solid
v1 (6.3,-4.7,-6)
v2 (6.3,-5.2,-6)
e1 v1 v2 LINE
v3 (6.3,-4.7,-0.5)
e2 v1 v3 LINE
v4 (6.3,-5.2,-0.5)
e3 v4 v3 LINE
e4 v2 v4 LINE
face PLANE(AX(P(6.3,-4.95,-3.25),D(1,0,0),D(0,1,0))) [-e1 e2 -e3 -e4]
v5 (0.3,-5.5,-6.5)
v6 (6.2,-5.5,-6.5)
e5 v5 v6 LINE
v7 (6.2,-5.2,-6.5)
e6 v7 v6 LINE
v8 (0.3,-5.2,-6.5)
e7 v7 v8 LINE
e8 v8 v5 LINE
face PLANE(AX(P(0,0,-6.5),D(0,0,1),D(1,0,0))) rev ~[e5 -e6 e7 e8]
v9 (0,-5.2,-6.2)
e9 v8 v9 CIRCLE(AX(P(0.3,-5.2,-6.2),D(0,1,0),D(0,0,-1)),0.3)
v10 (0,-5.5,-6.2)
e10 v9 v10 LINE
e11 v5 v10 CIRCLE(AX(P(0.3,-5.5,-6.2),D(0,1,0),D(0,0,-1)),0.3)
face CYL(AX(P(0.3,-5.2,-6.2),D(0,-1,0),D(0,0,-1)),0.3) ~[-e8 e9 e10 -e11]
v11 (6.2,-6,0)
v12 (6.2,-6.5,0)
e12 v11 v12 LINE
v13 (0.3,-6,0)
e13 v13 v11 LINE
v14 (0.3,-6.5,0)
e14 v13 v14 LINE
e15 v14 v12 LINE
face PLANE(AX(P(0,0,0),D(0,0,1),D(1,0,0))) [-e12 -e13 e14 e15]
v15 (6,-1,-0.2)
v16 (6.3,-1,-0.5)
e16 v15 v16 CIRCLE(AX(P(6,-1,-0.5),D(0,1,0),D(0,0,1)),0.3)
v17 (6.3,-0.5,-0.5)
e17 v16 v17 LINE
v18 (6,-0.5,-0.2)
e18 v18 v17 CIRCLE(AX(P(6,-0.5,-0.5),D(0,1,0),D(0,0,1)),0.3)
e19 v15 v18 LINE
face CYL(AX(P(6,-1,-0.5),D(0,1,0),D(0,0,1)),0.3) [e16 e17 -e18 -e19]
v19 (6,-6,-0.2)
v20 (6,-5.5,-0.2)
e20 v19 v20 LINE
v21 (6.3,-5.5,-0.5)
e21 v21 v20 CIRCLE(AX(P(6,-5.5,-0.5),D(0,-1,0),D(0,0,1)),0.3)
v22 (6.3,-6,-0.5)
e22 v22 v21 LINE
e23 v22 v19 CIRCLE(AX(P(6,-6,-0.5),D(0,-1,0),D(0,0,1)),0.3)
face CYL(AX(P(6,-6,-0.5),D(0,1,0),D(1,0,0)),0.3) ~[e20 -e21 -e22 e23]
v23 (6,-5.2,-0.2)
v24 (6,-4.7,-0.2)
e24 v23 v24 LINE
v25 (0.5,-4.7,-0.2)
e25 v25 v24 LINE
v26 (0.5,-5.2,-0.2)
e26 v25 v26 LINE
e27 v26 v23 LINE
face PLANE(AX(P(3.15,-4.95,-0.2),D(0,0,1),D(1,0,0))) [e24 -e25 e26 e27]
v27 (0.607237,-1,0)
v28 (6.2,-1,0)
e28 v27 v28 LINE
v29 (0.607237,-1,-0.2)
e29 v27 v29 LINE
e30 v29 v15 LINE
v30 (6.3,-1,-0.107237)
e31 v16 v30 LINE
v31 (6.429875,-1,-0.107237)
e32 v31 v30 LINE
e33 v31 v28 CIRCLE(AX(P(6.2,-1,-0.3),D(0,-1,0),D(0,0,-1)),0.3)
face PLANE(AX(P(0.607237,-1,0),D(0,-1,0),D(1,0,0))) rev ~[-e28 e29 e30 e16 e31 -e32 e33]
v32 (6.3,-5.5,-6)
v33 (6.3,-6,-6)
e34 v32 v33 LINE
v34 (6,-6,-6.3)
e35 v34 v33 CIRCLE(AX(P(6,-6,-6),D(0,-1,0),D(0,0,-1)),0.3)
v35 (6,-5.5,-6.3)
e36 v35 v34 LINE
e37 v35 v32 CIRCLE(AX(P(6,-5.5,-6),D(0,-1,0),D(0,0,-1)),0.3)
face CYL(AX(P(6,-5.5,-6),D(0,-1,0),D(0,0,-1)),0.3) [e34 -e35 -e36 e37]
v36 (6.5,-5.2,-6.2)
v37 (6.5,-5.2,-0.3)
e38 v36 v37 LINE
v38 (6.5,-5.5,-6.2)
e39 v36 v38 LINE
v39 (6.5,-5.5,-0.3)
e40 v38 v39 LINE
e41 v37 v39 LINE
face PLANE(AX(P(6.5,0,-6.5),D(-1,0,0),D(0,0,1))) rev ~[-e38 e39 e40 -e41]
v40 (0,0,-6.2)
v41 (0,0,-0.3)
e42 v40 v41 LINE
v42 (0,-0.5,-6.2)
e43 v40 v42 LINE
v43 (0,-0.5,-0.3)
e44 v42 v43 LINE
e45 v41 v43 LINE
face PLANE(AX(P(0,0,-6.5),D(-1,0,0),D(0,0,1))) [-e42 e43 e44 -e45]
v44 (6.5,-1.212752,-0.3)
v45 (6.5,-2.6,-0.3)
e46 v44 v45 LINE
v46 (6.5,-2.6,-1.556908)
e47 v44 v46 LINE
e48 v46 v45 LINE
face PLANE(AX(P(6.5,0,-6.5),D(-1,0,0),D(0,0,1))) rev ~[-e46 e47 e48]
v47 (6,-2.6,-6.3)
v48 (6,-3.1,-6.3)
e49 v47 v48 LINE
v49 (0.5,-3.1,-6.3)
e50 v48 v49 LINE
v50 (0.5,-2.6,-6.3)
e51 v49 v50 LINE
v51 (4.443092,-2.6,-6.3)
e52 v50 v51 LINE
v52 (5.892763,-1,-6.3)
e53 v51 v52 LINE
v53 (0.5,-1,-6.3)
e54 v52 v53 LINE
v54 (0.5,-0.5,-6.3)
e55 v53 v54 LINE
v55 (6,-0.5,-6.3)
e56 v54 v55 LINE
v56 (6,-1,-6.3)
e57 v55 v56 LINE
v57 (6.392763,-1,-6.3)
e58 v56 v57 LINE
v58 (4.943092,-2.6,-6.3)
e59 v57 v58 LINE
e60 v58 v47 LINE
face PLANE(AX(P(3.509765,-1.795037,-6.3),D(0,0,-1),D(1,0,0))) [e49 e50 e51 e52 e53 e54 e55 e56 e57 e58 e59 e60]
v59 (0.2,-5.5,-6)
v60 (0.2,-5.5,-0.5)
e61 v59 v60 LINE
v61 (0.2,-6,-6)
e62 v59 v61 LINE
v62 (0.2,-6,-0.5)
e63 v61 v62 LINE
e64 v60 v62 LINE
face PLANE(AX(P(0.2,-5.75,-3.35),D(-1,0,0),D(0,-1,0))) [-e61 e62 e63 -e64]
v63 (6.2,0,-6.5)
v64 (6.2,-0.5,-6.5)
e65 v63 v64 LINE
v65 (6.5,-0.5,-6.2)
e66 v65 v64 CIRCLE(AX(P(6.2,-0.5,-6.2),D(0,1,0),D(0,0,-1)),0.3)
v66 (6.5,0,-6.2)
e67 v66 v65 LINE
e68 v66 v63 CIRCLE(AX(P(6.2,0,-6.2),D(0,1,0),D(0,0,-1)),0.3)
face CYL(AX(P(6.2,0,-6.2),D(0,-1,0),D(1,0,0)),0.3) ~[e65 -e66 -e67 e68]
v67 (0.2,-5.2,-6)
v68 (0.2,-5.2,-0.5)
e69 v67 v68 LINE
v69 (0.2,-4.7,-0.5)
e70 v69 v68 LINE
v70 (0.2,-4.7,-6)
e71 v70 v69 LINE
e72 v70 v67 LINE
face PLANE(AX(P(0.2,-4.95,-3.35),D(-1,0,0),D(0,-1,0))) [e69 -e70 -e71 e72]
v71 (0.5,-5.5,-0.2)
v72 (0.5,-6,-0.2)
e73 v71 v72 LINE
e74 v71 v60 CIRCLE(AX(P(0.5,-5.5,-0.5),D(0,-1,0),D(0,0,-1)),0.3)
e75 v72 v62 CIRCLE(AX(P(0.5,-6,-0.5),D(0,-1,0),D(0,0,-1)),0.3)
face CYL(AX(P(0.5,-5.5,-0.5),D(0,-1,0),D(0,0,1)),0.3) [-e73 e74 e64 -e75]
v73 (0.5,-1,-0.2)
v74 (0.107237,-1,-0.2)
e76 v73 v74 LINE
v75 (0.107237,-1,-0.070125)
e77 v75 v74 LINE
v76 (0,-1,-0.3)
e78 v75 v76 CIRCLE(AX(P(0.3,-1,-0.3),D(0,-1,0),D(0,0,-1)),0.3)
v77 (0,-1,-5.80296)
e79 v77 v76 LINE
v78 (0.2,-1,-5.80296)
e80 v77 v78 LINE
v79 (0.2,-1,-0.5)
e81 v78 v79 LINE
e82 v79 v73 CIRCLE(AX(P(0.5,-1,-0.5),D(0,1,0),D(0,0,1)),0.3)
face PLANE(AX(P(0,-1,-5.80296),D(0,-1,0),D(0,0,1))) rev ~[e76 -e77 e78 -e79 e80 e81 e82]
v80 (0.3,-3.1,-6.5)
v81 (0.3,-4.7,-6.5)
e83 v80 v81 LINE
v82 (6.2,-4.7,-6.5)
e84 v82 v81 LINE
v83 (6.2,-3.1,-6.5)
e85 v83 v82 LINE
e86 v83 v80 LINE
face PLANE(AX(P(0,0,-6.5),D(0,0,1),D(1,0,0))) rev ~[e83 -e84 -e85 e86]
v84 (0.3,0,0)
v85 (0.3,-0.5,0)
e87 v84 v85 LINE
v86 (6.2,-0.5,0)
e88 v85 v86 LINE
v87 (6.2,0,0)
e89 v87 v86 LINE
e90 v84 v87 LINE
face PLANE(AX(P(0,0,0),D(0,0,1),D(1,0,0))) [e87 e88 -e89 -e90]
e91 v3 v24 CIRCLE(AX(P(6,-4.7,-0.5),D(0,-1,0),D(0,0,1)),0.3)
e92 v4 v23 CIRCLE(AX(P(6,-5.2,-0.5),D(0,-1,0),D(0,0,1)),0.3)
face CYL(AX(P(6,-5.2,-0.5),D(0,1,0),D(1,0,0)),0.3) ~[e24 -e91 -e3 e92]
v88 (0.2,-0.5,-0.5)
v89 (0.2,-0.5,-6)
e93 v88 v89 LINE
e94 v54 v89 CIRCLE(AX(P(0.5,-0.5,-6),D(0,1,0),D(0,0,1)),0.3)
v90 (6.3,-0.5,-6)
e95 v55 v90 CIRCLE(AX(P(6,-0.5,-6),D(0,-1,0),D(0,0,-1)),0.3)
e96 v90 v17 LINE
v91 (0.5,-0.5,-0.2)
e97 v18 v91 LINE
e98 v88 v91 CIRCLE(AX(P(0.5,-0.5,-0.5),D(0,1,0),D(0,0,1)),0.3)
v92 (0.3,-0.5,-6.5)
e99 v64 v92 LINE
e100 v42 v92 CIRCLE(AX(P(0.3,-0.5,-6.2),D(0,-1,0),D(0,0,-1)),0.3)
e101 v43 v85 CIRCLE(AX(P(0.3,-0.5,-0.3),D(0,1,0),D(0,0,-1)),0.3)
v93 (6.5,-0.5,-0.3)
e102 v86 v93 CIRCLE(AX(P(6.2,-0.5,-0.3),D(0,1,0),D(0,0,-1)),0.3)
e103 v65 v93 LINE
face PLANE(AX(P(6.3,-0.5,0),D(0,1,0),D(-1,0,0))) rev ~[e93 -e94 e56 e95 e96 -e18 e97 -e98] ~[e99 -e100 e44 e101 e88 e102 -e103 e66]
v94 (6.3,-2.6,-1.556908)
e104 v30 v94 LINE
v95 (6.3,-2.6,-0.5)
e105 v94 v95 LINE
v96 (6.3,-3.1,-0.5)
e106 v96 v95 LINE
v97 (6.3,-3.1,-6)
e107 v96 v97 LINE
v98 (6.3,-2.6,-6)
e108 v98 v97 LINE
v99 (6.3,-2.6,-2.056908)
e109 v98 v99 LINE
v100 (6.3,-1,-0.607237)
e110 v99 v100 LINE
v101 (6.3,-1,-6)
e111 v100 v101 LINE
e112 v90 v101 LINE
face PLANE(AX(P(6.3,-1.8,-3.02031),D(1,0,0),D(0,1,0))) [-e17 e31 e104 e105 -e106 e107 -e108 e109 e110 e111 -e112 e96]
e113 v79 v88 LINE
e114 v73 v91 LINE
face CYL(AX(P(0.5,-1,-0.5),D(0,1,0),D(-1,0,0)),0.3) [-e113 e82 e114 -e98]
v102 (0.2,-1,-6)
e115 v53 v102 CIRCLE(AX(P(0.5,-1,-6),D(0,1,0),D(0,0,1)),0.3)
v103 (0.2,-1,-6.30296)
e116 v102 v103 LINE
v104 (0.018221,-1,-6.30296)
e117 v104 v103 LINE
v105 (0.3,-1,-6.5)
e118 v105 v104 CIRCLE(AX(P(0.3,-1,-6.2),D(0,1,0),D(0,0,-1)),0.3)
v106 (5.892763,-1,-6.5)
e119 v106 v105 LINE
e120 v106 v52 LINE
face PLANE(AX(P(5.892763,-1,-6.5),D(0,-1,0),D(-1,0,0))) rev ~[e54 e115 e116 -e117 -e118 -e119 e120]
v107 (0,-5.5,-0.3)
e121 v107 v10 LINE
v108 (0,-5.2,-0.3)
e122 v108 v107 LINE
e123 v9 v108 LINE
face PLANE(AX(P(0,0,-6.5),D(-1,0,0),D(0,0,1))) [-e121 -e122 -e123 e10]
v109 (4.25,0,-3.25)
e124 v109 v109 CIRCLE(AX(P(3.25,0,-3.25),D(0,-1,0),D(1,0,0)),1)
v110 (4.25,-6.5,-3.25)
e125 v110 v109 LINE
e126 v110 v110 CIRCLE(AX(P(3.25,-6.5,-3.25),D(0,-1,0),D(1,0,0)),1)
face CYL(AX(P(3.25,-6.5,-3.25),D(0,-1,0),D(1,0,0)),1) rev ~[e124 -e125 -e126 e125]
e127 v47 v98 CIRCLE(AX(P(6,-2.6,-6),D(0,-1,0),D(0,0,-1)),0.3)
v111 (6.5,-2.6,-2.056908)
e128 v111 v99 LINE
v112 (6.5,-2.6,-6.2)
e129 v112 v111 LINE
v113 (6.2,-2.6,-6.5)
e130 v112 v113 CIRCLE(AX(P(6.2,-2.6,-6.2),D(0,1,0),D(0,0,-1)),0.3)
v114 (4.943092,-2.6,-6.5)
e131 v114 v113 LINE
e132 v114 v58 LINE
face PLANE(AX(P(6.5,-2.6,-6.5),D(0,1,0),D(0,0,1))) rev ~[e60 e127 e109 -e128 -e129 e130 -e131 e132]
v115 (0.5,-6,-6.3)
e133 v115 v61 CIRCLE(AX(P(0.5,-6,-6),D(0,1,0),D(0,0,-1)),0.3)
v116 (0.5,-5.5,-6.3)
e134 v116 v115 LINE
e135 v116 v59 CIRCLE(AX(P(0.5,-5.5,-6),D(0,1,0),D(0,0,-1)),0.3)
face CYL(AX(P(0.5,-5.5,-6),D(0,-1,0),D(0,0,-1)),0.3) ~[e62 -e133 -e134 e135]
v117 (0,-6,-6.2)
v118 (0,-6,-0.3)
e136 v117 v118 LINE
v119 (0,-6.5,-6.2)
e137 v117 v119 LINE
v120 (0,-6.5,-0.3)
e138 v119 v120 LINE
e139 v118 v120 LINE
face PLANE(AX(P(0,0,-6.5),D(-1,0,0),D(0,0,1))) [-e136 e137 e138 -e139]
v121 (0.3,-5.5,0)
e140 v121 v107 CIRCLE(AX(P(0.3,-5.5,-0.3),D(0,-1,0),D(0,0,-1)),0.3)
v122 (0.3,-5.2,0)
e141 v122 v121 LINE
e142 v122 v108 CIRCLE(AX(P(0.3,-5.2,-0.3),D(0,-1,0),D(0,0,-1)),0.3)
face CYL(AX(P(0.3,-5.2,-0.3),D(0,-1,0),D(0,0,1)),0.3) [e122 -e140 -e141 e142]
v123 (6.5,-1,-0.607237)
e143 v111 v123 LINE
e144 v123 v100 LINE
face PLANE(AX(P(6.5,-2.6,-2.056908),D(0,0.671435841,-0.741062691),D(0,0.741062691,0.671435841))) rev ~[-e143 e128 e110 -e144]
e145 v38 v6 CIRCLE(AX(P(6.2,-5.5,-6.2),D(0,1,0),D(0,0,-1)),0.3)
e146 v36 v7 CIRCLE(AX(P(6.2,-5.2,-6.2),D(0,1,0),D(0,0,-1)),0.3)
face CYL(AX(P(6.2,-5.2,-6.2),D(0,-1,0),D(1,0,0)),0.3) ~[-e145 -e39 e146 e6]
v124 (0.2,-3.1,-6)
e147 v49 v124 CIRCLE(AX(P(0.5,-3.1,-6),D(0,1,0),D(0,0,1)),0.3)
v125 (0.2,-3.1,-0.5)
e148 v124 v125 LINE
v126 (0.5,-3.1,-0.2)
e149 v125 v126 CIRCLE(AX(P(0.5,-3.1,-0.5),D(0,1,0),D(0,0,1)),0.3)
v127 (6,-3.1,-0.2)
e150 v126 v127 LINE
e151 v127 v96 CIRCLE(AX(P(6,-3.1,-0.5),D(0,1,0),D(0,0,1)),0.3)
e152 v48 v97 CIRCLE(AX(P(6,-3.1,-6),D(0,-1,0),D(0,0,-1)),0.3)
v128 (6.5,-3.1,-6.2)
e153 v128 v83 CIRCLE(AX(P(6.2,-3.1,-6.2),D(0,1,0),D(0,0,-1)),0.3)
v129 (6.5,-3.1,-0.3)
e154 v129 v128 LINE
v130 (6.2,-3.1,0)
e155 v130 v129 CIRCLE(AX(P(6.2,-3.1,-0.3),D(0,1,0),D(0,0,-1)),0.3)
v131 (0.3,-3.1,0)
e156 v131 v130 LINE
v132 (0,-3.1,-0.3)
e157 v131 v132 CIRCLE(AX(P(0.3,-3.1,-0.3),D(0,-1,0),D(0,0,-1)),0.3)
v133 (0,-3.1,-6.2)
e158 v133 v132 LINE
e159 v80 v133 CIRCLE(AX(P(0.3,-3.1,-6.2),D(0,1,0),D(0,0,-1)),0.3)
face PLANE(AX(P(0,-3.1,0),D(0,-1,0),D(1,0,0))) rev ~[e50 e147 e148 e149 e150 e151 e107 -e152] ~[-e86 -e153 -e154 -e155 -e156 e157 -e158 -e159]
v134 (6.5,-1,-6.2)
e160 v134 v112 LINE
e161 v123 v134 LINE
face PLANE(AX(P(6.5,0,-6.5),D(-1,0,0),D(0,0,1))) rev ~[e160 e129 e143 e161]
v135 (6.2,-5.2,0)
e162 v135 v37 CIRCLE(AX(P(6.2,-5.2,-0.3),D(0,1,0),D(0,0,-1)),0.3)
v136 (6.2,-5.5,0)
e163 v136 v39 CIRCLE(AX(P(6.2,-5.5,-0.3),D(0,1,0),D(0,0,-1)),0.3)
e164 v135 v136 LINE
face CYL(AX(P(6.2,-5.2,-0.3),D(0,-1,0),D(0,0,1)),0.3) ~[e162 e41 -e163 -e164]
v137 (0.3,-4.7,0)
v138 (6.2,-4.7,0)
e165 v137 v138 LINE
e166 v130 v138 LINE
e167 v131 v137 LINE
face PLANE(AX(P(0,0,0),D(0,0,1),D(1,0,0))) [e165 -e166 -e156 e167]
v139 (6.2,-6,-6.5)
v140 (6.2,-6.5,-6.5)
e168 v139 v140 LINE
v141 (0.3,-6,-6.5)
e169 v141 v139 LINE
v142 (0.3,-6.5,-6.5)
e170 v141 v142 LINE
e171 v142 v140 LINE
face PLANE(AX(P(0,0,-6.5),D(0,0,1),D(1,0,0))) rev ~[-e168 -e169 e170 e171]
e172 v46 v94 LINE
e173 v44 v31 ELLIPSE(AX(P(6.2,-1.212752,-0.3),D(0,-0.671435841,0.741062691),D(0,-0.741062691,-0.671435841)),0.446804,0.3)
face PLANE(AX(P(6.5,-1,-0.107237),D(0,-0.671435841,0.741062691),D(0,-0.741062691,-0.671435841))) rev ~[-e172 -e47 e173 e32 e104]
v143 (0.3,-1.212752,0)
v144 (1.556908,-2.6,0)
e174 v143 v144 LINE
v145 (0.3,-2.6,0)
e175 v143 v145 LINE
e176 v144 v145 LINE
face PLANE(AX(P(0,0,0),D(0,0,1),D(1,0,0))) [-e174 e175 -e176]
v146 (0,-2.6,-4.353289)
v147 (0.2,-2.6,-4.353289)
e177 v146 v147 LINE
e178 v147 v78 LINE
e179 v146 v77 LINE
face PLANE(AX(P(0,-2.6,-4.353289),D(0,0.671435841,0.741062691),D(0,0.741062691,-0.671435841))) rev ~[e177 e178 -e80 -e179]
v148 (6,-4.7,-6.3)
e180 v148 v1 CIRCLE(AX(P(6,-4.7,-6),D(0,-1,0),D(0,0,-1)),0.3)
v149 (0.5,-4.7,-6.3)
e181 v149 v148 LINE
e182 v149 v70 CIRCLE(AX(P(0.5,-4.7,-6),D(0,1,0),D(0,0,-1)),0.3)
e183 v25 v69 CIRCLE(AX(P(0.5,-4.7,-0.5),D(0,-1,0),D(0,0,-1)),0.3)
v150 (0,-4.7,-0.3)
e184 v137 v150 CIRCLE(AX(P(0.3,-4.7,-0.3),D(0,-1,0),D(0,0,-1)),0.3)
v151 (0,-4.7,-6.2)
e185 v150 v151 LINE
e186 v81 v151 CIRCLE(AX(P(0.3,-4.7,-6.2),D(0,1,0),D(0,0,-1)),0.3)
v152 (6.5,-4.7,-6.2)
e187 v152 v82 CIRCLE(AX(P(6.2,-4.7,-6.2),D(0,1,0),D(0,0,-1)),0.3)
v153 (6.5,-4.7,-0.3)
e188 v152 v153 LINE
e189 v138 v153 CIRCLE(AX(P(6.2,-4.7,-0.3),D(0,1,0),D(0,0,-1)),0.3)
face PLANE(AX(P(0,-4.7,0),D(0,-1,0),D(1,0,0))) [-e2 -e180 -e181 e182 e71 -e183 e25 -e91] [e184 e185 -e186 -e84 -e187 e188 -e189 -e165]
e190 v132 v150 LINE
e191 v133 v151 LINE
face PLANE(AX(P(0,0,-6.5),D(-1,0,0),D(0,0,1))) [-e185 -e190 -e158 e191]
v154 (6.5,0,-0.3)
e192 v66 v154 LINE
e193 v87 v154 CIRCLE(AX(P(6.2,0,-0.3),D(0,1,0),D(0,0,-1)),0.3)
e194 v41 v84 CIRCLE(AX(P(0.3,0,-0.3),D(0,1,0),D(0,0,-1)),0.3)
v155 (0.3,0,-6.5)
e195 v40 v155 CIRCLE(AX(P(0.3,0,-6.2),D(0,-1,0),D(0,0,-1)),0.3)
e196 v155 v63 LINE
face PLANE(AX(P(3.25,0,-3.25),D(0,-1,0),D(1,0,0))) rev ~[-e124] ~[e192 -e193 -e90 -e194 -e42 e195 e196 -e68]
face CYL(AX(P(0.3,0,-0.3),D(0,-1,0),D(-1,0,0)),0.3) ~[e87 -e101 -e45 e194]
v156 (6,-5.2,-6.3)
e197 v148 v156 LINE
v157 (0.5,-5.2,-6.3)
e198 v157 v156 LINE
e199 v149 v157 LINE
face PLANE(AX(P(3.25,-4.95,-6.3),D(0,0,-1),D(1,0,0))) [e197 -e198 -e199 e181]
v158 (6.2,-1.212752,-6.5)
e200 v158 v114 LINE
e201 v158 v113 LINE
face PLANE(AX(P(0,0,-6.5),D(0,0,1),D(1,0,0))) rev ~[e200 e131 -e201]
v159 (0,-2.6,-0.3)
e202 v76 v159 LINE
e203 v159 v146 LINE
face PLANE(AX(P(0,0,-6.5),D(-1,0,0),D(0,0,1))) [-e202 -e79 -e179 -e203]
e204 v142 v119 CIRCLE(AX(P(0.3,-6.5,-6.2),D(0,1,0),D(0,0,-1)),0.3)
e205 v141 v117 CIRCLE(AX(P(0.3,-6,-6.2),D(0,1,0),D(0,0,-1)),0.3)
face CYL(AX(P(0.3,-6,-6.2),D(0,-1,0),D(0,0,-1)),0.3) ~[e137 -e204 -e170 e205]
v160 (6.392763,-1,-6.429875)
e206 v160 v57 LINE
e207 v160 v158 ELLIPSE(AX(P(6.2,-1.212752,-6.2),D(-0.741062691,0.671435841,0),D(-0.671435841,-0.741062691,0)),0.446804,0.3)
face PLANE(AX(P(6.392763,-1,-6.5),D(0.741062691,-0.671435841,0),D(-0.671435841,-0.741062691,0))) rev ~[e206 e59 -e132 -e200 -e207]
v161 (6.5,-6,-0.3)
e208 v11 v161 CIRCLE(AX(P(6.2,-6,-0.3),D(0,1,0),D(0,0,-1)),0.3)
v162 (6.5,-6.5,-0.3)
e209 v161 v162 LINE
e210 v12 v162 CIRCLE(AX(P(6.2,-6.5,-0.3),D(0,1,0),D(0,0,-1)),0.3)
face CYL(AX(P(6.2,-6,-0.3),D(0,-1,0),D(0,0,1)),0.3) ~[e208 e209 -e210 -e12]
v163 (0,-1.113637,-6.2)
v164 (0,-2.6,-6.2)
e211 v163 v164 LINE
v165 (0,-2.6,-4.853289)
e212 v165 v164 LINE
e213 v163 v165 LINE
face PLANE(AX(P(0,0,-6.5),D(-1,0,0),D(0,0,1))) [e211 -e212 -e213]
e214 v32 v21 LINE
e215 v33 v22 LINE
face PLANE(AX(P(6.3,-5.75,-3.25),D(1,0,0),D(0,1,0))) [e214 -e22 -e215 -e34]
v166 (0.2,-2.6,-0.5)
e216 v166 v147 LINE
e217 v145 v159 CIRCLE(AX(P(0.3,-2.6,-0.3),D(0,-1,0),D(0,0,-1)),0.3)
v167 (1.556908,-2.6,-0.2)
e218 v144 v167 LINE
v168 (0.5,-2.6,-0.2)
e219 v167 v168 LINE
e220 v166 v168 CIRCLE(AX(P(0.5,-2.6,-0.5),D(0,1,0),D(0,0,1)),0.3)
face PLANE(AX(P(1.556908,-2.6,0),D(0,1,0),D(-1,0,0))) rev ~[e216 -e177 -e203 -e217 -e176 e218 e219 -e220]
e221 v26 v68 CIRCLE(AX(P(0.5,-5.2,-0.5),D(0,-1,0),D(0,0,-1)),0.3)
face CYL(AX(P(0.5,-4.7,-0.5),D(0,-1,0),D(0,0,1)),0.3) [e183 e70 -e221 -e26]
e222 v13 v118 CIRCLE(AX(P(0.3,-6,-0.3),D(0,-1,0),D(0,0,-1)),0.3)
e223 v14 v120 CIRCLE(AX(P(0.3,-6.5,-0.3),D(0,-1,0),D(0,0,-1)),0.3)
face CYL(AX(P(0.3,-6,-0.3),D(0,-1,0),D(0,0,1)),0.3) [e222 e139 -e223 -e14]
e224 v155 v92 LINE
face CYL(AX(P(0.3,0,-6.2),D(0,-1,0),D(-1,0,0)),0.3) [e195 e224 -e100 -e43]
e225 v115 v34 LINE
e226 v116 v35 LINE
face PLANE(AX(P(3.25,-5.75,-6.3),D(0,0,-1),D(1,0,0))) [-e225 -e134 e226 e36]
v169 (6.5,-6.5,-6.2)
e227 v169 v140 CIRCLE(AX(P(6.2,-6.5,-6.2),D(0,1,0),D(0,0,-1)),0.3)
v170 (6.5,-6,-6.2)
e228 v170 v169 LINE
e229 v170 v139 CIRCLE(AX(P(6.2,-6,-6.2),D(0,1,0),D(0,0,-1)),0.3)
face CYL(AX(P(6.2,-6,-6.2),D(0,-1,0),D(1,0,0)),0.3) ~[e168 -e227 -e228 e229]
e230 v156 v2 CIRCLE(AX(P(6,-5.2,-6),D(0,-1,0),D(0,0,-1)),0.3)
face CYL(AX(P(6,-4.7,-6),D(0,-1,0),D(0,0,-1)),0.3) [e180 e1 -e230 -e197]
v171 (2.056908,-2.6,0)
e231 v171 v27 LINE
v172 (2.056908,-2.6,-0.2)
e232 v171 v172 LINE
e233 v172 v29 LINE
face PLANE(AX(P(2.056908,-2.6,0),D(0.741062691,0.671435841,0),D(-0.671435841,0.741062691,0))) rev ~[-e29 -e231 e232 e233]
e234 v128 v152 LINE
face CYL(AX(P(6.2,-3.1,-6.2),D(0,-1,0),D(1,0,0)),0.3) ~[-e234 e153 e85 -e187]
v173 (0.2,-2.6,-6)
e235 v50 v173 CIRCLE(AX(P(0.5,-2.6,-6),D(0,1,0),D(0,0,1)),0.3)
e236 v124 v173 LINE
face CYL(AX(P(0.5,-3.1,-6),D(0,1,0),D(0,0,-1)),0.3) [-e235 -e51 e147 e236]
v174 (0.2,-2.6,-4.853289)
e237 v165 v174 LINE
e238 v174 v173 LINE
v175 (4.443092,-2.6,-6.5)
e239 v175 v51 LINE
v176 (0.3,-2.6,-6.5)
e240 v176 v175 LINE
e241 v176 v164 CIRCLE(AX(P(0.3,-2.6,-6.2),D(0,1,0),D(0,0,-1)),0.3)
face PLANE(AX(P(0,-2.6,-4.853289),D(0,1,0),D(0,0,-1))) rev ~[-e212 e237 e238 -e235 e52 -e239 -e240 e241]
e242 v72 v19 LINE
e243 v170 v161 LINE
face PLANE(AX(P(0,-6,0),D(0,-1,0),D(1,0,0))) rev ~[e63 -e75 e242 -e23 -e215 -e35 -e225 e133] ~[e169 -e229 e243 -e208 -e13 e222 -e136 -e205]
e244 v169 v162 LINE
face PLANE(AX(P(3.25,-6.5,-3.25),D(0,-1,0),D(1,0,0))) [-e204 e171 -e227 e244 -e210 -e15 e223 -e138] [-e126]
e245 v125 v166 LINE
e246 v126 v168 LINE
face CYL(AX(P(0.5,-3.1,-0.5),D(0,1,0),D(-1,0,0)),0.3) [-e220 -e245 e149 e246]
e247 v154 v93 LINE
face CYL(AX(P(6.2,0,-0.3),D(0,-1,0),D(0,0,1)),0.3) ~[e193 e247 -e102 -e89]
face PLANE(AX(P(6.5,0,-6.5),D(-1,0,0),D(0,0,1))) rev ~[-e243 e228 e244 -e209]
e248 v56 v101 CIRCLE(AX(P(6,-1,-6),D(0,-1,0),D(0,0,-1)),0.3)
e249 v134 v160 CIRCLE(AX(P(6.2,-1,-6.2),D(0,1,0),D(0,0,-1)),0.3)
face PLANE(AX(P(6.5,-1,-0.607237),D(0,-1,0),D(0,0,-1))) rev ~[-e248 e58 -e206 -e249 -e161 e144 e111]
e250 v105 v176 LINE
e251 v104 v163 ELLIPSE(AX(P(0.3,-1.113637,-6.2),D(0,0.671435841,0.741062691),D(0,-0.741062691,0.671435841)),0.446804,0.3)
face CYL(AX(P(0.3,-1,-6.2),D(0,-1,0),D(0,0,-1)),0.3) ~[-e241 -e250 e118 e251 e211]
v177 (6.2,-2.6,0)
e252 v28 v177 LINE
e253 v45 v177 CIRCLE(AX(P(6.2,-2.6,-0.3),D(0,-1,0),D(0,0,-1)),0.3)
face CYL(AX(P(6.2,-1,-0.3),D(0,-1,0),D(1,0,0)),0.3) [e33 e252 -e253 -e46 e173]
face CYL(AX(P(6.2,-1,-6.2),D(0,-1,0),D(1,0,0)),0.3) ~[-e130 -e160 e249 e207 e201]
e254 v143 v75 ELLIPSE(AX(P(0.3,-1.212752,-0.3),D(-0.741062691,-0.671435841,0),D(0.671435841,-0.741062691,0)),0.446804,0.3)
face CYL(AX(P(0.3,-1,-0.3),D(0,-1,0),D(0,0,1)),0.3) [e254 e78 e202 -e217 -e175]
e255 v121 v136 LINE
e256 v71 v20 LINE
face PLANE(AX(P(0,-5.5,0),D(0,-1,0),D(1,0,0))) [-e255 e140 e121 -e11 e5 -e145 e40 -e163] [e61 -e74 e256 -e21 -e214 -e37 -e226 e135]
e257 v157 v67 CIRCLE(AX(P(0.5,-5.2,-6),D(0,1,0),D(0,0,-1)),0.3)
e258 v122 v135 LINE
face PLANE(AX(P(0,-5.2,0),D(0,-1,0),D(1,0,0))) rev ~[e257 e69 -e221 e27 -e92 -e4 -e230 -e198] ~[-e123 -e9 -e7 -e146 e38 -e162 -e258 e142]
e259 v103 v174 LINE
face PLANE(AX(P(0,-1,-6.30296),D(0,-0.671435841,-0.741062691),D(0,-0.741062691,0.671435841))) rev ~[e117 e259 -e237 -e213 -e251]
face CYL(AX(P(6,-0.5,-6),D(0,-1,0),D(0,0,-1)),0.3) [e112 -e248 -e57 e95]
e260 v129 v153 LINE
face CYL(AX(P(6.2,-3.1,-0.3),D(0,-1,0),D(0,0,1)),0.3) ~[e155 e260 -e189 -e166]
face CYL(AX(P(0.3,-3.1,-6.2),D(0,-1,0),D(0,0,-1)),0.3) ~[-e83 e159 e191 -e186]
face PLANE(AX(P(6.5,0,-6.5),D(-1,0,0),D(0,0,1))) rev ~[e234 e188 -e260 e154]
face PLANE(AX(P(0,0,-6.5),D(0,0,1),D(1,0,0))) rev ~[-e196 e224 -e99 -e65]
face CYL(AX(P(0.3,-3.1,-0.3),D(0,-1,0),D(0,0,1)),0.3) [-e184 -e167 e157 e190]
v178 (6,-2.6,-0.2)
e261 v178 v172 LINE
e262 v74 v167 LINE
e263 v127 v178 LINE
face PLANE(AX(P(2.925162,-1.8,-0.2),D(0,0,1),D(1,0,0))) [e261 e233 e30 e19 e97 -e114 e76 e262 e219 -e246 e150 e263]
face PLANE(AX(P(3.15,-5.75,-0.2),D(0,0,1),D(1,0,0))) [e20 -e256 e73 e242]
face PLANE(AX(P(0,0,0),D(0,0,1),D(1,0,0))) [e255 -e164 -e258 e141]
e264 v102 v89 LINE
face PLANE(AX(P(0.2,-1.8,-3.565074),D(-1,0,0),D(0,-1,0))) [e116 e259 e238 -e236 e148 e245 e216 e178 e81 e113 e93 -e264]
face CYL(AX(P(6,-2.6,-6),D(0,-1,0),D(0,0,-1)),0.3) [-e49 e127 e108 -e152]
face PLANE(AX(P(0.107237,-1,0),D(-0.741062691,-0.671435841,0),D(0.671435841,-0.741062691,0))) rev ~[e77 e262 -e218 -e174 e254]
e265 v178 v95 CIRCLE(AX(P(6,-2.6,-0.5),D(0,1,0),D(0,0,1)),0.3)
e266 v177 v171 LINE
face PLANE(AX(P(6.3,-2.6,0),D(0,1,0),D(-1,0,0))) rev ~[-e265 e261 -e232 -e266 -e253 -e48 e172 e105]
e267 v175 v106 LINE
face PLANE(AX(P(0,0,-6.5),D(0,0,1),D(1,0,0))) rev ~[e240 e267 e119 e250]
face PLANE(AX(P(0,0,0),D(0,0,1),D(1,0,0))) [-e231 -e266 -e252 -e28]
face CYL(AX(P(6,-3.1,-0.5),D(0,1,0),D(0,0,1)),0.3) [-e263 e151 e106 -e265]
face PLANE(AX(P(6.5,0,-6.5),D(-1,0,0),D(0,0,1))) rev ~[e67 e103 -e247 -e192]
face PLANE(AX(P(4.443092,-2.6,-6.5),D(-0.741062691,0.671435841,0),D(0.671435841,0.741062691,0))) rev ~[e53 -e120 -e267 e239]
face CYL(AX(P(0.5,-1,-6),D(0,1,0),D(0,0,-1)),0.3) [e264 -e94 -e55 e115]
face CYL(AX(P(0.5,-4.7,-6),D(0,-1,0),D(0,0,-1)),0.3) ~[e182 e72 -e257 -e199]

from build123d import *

# Parameters (mm, degrees)
F0_W      = 6.5
F0_H      = 6.5
F1_DEPTH  = 6.5
F2_R      = 1
F3_DEPTH  = 25
F4_W      = 0.5
F4_H      = 6.5
F5_DEPTH  = 0.2
F6_W      = 6.3
F6_H      = 0.5
F7_DEPTH  = 0.2
F8_W      = 0.5
F8_H      = 6.3
F9_DEPTH  = 0.2
F10_W     = 6.1
F10_H     = 0.5
F11_DEPTH = 0.2
F12_R     = 0.3


with BuildPart() as f1:
    # F0 (on Front) → F1 (new body)
    with BuildSketch(Plane.XZ):
        with Locations((3.25, -3.25)):
            Rectangle(F0_W, F0_H)
    extrude(amount=F1_DEPTH)

    # F2 (on face) → F3 (cut)
    with BuildSketch(Plane.XZ.offset(6.5)):
        with Locations((3.25, -3.25)):
            Circle(F2_R)
    extrude(amount=-F3_DEPTH, mode=Mode.SUBTRACT)

    # F4 (on face) → F5 (cut)
    with BuildSketch(Plane.YZ.offset(6.5)):
        with Locations((-5.75, -3.25)):
            Rectangle(F4_W, F4_H)
        with Locations((-4.95, -3.25)):
            Rectangle(F4_W, F4_H)
        Polygon((-3.1, 0), (-3.1, -6.5), (-2.6, -6.5), (-2.6, -2.0569080953), (-1, -0.6072367541), (-1, -6.5), (-0.5, -6.5), (-0.5, 0), (-1, 0), (-1, -0.1072367541), (-2.6, -1.5569080953), (-2.6, 0), align=None)
    extrude(amount=-F5_DEPTH, mode=Mode.SUBTRACT)

    # F6 (on face) → F7 (cut)
    with BuildSketch(Plane.XY):
        with Locations((3.15, -5.75)):
            Rectangle(F6_W, F6_H)
        with Locations((3.15, -4.95)):
            Rectangle(F6_W, F6_H)
        Polygon((0, -2.6), (0, -3.1), (6.3, -3.1), (6.3, -2.6), (2.0569080953, -2.6), (0.6072367541, -1), (6.3, -1), (6.3, -0.5), (0, -0.5), (0, -1), (0.1072367541, -1), (1.5569080953, -2.6), align=None)
    extrude(amount=-F7_DEPTH, mode=Mode.SUBTRACT)

    # F8 (on face) → F9 (cut)
    with BuildSketch(Plane(origin=(0, 0, 0), x_dir=(0, -1, 0), z_dir=(-1, 0, 0))):
        with Locations((5.75, -3.35)):
            Rectangle(F8_W, F8_H)
        with Locations((4.95, -3.35)):
            Rectangle(F8_W, F8_H)
        Polygon((2.6, -6.5), (3.1, -6.5), (3.1, -0.2), (2.6, -0.2), (2.6, -4.3532891255), (1, -5.8029604666), (1, -0.2), (0.5, -0.2), (0.5, -6.5), (1, -6.5), (1, -6.3029604666), (2.6, -4.8532891255), align=None)
    extrude(amount=-F9_DEPTH, mode=Mode.SUBTRACT)

    # F10 (on face) → F11 (cut)
    with BuildSketch(Plane(origin=(0, 0, -6.5), x_dir=(1, 0, 0), z_dir=(0, 0, -1))):
        with Locations((3.25, 5.75)):
            Rectangle(F10_W, F10_H)
        with Locations((3.25, 4.95)):
            Rectangle(F10_W, F10_H)
        Polygon((6.3, 3.1), (0.2, 3.1), (0.2, 2.6), (4.4430919047, 2.6), (5.8927632459, 1), (0.2, 1), (0.2, 0.5), (6.3, 0.5), (6.3, 1), (6.3927632459, 1), (4.9430919047, 2.6), (6.3, 2.6), align=None)
    extrude(amount=-F11_DEPTH, mode=Mode.SUBTRACT)

    # F12
    f12_edges = [f1.edges().sort_by_distance(p)[0] for p in [
        (0, -6.25, -6.5),
        (0.2, -5.75, -6.3),
        (0.2, -4.95, -6.3),
        (0, -5.35, -6.5),
        (0, -3.9, -6.5),
        (0.2, -2.85, -6.3),
        (0, -1.8, -6.5),
        (0.2, -0.75, -6.3),
        (0, -0.25, -6.5),
        (6.5, -0.25, -6.5),
        (6.3, -0.75, -6.3),
        (6.5, -1.8, -6.5),
        (6.3, -4.95, -6.3),
        (6.5, -3.9, -6.5),
        (6.5, -5.35, -6.5),
        (6.3, -5.75, -6.3),
        (6.5, -6.25, -6.5),
        (6.5, -0.25, 0),
        (6.3, -0.75, -0.2),
        (6.5, -1.8, 0),
        (6.3, -2.85, -0.2),
        (6.5, -3.9, 0),
        (6.3, -4.95, -0.2),
        (6.5, -5.35, 0),
        (6.3, -5.75, -0.2),
        (6.5, -6.25, 0),
        (0, -0.25, 0),
        (0.2, -0.75, -0.2),
        (0, -1.8, 0),
        (0.2, -2.85, -0.2),
        (0, -3.9, 0),
        (0.2, -4.95, -0.2),
        (0, -5.35, 0),
        (0.2, -5.75, -0.2),
        (0, -6.25, 0),
        (6.3, -2.85, -6.3),
    ]]
    fillet(f12_edges, radius=F12_R)


solid = f1.part
